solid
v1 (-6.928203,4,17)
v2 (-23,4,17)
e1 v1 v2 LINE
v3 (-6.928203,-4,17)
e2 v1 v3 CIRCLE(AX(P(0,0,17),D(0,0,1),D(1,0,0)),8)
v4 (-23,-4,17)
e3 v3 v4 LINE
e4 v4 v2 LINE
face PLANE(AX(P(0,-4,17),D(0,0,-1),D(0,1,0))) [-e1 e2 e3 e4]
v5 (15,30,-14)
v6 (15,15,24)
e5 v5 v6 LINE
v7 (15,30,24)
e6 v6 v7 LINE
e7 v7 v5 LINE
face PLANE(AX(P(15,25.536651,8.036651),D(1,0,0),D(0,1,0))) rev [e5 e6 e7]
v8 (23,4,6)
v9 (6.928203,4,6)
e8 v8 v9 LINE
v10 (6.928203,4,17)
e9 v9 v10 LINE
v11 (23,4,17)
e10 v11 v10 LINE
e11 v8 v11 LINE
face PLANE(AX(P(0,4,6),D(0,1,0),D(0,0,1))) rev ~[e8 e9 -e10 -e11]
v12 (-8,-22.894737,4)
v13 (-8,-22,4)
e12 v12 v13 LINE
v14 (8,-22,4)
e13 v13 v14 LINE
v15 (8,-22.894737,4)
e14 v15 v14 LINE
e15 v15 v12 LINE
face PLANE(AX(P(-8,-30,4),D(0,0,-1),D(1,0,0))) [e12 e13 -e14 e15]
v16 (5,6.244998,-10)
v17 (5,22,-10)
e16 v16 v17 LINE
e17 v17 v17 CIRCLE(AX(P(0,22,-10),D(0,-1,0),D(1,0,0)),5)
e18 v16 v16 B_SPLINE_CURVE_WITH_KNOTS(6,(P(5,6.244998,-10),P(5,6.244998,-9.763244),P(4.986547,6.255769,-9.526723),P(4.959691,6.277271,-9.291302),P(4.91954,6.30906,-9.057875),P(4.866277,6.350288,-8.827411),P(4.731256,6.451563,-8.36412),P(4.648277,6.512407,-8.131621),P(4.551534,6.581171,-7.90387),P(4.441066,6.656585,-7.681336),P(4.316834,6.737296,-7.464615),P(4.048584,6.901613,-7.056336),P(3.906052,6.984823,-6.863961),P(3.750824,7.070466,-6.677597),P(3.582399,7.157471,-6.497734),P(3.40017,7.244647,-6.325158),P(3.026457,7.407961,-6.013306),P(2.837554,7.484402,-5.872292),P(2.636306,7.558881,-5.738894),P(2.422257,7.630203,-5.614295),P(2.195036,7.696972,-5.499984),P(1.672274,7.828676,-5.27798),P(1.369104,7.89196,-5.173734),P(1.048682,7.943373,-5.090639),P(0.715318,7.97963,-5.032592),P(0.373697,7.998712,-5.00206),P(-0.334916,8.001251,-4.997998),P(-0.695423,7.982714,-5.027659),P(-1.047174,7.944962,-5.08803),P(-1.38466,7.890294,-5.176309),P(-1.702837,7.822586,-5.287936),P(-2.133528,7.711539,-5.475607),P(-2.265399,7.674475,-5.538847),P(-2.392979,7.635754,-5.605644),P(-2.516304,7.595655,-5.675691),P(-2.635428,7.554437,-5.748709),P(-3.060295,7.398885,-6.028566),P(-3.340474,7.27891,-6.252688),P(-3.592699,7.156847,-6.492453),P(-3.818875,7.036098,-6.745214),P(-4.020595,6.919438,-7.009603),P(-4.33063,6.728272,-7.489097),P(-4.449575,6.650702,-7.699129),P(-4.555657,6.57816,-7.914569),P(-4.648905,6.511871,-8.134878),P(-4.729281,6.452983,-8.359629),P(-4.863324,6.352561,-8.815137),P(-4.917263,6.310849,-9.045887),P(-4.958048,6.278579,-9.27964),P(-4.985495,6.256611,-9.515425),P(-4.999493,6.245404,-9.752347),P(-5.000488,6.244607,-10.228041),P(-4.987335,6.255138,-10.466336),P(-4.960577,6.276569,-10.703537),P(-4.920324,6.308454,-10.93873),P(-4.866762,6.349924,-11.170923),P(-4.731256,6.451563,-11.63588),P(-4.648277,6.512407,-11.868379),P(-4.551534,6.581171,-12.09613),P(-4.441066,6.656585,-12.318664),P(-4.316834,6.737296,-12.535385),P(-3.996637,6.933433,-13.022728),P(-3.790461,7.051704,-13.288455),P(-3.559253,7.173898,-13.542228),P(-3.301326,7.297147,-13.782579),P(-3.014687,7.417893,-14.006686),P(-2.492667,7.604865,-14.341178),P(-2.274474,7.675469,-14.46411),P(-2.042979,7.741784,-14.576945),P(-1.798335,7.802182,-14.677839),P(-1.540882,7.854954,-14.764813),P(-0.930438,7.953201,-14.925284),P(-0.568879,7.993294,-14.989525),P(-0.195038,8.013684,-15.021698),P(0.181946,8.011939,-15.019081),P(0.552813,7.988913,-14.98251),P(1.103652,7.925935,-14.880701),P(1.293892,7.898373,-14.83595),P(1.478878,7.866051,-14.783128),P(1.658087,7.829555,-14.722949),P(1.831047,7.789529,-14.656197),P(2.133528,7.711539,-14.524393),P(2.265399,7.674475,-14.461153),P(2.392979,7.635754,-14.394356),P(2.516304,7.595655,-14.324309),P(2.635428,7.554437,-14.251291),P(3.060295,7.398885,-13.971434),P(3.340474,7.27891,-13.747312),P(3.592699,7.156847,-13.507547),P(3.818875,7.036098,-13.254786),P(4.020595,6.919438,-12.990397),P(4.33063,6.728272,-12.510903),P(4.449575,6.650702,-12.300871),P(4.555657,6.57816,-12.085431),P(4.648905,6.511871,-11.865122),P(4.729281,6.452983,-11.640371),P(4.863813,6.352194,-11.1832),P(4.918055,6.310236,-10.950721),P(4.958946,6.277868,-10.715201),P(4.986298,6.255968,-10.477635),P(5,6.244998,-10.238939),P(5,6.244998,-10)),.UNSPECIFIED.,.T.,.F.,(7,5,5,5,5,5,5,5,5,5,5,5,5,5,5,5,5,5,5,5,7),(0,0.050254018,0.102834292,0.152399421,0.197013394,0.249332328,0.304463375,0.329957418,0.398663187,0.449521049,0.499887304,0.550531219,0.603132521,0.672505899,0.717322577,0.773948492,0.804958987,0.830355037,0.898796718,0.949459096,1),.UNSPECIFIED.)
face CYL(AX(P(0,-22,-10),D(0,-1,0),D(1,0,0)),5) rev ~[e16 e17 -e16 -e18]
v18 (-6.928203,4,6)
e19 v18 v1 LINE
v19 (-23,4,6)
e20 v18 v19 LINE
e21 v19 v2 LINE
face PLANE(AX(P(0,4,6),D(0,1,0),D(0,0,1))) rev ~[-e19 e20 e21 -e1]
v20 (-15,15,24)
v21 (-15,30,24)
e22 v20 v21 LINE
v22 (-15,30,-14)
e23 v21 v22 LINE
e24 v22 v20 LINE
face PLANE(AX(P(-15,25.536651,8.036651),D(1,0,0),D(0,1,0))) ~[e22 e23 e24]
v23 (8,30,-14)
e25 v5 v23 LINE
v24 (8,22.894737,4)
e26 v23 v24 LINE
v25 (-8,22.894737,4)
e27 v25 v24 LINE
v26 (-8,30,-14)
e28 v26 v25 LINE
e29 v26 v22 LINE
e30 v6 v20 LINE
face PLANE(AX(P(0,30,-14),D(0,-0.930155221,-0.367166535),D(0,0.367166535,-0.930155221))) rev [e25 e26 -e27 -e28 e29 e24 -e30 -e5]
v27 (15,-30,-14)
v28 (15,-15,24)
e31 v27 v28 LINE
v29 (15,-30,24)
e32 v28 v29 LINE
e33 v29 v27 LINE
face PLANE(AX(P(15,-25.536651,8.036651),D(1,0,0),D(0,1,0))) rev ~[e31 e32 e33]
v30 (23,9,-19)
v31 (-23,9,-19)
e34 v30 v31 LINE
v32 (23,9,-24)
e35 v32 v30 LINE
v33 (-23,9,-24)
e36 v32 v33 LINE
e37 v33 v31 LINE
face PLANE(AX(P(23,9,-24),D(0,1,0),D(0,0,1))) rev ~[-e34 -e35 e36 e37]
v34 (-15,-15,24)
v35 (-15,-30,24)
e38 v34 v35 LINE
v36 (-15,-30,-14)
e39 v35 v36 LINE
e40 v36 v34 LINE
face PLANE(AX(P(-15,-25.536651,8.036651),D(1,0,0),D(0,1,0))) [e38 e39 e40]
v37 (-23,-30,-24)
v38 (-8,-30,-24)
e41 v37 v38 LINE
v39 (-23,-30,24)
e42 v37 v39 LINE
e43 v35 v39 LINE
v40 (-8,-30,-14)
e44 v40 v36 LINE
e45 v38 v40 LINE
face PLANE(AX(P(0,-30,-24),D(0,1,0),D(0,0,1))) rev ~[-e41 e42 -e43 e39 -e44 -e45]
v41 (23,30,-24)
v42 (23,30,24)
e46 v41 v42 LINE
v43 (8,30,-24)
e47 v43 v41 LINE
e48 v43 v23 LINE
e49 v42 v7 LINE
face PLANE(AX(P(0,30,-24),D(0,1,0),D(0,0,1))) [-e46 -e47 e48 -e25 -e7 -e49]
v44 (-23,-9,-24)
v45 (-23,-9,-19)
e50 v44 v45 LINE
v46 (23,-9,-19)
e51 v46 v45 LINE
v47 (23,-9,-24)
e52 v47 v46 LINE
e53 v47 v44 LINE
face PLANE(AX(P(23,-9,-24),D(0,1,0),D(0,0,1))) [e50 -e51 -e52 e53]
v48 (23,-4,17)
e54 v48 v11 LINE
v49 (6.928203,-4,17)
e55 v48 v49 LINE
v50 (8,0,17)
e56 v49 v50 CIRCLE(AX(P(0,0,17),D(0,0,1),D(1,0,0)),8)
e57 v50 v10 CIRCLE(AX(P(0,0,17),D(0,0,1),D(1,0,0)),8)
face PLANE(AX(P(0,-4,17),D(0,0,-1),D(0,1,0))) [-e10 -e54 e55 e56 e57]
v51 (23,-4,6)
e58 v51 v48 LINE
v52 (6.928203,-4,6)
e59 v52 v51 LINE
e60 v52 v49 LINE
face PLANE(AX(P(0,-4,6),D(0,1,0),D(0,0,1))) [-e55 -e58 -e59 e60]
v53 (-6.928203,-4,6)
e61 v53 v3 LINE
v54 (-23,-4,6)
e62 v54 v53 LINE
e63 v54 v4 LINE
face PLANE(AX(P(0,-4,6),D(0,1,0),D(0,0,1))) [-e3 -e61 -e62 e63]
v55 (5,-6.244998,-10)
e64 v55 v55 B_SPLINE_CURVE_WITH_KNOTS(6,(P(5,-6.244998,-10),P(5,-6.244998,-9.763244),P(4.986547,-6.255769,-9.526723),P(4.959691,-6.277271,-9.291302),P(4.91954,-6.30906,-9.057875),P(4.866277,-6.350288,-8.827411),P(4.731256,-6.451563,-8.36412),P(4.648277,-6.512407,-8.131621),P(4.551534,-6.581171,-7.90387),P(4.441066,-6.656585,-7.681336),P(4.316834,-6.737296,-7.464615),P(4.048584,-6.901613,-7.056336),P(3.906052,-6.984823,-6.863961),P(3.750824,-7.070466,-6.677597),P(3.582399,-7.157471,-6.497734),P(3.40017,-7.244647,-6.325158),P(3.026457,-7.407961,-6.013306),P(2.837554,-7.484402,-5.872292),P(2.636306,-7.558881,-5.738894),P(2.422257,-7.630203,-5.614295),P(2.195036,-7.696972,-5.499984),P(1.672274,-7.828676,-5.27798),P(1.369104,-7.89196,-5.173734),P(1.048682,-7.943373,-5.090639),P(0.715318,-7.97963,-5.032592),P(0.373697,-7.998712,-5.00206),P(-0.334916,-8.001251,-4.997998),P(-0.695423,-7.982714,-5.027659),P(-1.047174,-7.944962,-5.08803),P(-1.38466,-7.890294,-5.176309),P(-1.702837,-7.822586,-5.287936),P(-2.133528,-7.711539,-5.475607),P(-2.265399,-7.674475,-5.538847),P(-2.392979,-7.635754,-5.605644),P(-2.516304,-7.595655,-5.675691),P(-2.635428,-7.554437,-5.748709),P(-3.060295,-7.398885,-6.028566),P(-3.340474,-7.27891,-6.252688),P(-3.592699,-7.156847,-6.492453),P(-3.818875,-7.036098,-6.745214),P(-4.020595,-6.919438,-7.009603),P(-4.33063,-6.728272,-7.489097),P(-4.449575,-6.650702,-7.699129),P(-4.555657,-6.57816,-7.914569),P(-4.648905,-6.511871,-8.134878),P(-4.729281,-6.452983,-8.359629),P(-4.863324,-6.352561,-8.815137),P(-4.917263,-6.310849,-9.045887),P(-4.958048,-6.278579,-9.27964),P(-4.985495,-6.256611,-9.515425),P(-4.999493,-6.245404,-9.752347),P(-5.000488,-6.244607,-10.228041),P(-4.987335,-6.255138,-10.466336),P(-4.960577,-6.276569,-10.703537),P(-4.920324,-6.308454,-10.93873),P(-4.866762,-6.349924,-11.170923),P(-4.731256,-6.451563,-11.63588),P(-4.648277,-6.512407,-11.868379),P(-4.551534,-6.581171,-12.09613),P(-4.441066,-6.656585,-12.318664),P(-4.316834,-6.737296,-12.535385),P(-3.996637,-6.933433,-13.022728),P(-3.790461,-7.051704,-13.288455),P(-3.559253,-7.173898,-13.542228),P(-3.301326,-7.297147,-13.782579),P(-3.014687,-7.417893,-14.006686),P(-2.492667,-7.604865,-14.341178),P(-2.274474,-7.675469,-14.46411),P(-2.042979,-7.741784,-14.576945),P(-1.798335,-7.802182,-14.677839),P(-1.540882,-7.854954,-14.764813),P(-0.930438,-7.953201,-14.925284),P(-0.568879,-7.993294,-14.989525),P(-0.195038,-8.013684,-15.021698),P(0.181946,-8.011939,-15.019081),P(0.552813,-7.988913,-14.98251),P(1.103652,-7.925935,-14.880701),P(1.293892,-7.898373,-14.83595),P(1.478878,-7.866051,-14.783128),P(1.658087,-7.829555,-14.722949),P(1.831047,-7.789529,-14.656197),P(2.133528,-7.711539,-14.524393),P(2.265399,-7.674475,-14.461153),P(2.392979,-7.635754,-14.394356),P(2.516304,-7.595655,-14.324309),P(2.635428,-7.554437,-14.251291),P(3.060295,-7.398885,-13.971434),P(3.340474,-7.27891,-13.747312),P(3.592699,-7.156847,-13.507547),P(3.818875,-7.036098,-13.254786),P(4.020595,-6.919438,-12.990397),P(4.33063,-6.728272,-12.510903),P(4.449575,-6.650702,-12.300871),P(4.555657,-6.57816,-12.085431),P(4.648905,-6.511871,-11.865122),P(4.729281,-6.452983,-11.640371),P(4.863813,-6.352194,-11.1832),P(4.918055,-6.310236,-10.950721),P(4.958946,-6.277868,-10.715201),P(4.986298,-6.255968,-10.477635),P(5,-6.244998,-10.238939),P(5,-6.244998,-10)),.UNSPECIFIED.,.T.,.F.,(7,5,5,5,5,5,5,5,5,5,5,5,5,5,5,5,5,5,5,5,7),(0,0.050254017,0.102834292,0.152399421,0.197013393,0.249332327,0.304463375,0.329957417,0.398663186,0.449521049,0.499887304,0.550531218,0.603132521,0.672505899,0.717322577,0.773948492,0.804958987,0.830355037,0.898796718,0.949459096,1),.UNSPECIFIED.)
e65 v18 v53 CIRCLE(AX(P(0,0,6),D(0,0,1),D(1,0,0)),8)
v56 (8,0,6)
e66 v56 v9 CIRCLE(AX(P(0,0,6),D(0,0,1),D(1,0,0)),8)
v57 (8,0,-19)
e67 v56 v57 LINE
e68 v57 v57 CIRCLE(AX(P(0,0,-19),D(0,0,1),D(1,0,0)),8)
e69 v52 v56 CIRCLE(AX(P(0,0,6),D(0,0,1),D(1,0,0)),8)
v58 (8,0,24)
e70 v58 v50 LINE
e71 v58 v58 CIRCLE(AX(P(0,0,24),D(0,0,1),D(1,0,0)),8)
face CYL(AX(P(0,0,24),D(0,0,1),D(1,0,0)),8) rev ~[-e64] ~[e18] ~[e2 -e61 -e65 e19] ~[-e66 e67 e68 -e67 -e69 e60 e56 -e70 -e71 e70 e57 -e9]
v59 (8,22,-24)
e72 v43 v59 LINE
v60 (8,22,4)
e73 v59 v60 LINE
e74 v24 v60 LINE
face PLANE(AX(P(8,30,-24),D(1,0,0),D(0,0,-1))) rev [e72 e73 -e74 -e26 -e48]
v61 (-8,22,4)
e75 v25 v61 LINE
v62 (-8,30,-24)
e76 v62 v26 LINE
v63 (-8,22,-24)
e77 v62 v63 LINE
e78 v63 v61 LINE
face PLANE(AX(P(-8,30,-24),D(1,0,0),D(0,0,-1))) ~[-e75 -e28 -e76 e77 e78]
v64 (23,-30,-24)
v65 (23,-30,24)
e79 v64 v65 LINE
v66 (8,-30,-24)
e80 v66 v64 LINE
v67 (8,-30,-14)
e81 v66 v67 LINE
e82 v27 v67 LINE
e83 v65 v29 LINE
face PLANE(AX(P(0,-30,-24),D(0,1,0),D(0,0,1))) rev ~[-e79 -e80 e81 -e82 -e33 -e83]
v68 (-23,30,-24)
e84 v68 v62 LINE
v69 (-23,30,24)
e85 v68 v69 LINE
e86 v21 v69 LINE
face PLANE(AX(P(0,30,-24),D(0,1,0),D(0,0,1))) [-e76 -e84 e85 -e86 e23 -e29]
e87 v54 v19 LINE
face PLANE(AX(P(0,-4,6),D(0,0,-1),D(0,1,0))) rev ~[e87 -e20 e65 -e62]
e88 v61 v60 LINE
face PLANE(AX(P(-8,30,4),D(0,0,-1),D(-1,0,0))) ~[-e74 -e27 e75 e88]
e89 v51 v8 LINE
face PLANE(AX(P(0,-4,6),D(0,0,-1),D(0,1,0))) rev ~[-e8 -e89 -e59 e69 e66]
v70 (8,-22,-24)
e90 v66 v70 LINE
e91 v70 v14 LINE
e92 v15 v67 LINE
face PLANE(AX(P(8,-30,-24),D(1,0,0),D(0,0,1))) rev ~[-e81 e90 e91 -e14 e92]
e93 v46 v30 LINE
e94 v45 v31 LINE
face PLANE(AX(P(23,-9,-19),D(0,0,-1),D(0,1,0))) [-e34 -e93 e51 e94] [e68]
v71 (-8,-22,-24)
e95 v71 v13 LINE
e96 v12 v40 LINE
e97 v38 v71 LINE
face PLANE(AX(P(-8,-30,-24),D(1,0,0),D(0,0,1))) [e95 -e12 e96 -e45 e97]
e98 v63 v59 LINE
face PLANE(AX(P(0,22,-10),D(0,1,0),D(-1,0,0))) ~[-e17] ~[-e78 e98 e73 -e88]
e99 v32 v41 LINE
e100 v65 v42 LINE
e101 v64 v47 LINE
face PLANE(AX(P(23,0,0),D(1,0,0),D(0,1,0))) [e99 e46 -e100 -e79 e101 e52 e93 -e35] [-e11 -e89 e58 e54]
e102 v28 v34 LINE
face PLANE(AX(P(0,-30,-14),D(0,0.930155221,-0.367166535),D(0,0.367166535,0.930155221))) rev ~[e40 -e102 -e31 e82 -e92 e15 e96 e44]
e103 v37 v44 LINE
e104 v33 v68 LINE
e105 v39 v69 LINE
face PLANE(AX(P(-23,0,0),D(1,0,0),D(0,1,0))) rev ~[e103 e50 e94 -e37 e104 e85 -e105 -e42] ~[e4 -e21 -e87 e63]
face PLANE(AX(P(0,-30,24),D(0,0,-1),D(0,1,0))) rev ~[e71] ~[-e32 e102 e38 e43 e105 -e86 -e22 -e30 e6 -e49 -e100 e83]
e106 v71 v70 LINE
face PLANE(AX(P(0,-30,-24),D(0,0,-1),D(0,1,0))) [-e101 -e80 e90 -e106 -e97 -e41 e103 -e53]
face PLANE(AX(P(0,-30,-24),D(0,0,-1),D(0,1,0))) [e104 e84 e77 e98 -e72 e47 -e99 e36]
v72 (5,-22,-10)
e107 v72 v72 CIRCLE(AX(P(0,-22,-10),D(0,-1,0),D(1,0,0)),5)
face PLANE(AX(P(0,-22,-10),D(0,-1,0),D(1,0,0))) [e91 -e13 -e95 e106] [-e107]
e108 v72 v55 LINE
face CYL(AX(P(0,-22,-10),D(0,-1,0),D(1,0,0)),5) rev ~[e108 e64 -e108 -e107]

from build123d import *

# Parameters (mm, degrees)
F0_W      = 60
F0_H      = 48
F0_W_2    = 8
F0_H_2    = 11
F1_DEPTH  = 23
F2_W      = 18
F2_H      = 5
F3_DEPTH  = 46.001
F5_DEPTH  = 15
F6_R      = 8
F7_DEPTH  = 48.001
F8_W      = 16
F8_H      = 28
F9_DEPTH  = 8
F10_R     = 5
F11_DEPTH = 52.001


# Not quite as in the source:
# - a pattern or mirror of a feature is missing from the dataset's text; its kind, count and spacing are read off the source's solid


with BuildPart() as f1:
    # F0 (on Right) → F1 (new body, symmetric)
    with BuildSketch(Plane.YZ):
        Rectangle(F0_W, F0_H)
        with Locations((0, 11.5)):
            Rectangle(F0_W_2, F0_H_2, mode=Mode.SUBTRACT)
    extrude(amount=F1_DEPTH, both=True)

    # F2 (on face) → F3 (cut, through all)
    with BuildSketch(Plane.YZ.offset(23)):
        with Locations((0, -21.5)):
            Rectangle(F2_W, F2_H)
    extrude(amount=-F3_DEPTH, mode=Mode.SUBTRACT)

    # F4 (on Right) → F5 (cut, symmetric)
    with BuildSketch(Plane.YZ):
        Polygon((-15, 24), (-30, 24), (-30, -14), align=None)
    f5 = extrude(amount=F5_DEPTH, both=True, mode=Mode.SUBTRACT)

    # F5_copies: F5 across plane
    add(f5.mirror(Plane.ZX), mode=Mode.SUBTRACT)

    # F6 (on face) → F7 (cut, through all)
    with BuildSketch(Plane.XY.offset(24)):
        Circle(F6_R)
    extrude(amount=-F7_DEPTH, mode=Mode.SUBTRACT)

    # F8 (on face) → F9 (cut)
    with BuildSketch(Plane.XZ.offset(30)):
        with Locations((0, -10)):
            Rectangle(F8_W, F8_H)
    f9 = extrude(amount=-F9_DEPTH, mode=Mode.SUBTRACT)

    # F9_copies: F9 across plane
    add(f9.mirror(Plane.ZX), mode=Mode.SUBTRACT)

    # F10 (on face) → F11 (cut, through all)
    with BuildSketch(Plane.XZ.offset(22)):
        with Locations((0, -10)):
            Circle(F10_R)
    extrude(amount=-F11_DEPTH, mode=Mode.SUBTRACT)


solid = f1.part
